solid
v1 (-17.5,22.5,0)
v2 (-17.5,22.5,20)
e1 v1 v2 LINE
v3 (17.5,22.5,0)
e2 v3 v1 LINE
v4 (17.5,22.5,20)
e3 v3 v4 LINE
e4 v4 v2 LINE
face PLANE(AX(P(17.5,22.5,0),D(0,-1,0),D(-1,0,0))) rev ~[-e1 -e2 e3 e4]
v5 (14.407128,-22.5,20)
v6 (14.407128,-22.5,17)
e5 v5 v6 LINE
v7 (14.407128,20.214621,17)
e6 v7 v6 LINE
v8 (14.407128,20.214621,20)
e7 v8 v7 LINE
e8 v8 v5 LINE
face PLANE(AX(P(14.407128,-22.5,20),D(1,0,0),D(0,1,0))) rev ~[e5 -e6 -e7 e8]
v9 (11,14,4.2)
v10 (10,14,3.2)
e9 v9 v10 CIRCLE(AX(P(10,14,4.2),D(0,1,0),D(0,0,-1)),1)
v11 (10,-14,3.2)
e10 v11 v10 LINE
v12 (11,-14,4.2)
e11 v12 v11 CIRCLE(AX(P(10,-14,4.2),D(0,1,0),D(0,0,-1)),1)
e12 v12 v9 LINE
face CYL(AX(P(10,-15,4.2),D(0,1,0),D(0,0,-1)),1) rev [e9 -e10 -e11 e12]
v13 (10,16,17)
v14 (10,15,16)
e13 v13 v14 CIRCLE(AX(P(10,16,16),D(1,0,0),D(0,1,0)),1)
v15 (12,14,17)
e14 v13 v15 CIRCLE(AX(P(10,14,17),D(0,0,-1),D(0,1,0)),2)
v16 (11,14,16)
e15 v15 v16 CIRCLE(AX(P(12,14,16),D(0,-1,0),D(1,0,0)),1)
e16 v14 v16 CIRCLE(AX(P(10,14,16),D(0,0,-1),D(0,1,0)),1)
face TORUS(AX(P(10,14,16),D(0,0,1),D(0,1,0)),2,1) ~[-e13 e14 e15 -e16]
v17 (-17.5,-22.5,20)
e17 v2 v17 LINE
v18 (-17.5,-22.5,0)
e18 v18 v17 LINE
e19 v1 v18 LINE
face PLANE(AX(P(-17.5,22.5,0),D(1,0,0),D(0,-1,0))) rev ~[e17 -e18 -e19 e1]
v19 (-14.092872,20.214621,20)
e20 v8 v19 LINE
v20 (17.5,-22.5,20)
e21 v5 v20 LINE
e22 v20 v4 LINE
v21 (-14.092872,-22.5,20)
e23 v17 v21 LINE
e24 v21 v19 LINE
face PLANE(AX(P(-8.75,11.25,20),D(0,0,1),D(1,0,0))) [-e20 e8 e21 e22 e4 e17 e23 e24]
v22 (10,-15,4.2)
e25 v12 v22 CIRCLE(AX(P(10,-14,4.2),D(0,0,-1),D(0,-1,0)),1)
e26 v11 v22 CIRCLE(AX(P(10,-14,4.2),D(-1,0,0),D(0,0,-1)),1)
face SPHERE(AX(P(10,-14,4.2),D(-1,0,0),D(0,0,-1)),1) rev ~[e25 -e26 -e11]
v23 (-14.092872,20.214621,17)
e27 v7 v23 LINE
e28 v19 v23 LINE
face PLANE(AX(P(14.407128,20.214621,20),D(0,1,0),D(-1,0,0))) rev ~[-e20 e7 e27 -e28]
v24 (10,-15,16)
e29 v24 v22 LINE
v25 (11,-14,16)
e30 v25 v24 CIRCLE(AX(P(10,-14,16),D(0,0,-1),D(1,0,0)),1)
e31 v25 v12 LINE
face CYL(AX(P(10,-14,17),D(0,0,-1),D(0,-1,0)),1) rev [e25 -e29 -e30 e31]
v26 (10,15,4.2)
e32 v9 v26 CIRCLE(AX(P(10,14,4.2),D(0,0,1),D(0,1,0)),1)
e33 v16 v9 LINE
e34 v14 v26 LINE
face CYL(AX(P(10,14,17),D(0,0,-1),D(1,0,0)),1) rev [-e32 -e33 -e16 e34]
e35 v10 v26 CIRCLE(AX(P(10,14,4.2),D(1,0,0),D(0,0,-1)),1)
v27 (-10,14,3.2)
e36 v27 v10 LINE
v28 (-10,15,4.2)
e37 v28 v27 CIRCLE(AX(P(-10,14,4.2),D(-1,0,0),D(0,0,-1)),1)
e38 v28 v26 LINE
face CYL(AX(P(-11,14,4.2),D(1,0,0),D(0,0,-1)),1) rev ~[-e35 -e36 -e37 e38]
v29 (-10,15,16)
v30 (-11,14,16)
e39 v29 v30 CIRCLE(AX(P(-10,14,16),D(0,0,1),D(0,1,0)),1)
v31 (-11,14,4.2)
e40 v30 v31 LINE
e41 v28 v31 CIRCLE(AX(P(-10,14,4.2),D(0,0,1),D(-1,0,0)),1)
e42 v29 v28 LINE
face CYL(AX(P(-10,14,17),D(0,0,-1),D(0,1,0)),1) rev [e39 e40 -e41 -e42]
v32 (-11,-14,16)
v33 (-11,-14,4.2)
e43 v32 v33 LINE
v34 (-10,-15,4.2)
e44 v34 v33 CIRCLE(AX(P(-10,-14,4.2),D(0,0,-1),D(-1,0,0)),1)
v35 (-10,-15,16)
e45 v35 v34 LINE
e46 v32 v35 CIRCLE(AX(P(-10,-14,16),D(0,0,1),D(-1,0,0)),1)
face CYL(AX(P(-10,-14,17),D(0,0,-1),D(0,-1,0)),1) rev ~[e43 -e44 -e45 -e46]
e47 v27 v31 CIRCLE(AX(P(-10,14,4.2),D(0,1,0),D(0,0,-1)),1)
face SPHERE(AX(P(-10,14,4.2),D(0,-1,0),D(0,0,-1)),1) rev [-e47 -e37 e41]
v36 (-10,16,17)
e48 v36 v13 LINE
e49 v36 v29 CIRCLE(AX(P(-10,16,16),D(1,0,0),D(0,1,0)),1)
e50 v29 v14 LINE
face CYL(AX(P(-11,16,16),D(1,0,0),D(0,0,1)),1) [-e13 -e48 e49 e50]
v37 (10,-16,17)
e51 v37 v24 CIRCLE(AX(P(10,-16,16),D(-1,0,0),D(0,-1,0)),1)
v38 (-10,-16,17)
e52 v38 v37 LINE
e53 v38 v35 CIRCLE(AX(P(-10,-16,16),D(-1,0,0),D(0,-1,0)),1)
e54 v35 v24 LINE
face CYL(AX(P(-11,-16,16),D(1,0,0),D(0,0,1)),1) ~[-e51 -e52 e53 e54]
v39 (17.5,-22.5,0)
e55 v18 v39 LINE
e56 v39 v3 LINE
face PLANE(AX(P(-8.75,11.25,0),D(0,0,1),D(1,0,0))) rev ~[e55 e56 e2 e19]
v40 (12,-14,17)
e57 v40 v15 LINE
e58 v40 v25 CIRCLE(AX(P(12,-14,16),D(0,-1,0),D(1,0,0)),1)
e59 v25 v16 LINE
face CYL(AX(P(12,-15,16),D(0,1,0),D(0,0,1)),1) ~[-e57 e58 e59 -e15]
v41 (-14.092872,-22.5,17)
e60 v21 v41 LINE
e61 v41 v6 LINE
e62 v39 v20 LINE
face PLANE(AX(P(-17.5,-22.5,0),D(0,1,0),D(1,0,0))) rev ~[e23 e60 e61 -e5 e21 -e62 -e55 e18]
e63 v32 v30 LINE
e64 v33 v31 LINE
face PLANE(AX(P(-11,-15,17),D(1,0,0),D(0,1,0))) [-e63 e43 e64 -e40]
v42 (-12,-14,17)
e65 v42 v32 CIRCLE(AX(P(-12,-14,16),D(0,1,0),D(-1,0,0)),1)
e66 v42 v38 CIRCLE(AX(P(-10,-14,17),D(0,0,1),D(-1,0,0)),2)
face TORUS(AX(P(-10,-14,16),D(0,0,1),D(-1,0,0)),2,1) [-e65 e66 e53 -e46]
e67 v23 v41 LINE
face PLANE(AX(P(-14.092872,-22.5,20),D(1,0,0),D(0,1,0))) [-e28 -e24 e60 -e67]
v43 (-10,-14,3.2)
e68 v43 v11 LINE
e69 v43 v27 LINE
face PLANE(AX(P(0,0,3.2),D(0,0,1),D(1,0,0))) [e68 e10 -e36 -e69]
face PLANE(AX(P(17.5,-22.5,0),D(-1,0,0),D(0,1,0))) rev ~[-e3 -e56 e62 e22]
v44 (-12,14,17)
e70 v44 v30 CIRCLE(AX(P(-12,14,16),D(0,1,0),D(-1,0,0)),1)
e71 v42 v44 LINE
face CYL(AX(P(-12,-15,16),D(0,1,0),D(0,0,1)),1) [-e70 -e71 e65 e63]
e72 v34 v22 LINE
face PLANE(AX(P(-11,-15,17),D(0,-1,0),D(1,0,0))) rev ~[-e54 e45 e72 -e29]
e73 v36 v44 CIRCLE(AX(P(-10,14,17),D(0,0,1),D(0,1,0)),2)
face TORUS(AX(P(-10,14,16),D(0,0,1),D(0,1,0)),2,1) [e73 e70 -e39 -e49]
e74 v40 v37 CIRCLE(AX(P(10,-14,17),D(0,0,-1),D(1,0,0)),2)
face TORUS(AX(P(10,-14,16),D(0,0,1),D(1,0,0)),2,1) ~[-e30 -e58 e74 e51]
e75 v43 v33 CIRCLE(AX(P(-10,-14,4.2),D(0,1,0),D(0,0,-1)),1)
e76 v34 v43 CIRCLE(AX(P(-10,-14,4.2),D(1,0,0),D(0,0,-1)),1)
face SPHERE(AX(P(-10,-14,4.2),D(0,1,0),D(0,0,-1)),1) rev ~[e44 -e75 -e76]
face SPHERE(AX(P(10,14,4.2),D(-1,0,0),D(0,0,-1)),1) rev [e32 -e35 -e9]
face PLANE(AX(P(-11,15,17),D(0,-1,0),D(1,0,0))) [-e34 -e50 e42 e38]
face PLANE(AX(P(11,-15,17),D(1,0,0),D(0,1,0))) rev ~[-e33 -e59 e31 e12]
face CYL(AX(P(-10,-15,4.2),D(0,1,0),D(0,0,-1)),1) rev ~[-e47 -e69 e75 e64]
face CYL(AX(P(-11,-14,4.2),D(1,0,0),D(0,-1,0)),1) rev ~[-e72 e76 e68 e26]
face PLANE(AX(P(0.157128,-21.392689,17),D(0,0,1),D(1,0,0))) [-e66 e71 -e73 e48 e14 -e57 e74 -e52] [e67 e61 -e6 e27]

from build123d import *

# Parameters (mm, degrees)
F1_DEPTH = 20
F3_DEPTH = 3
F4_W     = 22
F4_H     = 30
F5_DEPTH = 13.8
F6_W     = 28.5
F6_H     = 2.2146213427
F7_DEPTH = 3
F8_R     = 1


with BuildPart() as f1:
    # F0 (on Top) → F1 (new body)
    with BuildSketch(Plane.XY):
        Polygon((0, 22.5), (-17.5, 22.5), (-17.5, 0), (-14.605, 0), (0, 0), (0, 20.066), align=None)
        Polygon((17.5, 22.5), (0, 22.5), (0, 20.066), (0, 0), (-14.605, 0), (-17.5, 0), (-17.5, -22.5), (17.5, -22.5), align=None)
    extrude(amount=F1_DEPTH)

    # F2 (on face) → F3 (cut)
    with BuildSketch(Plane.XY.offset(20)):
        Polygon((0.1571281302, 20.2146213427), (-14.0928718698, 20.2146213427), (-14.0928718698, 0), (-14.0928718698, -20.2853786573), (14.4071281302, -20.2853786573), (14.4071281302, 20.2146213427), align=None)
    extrude(amount=-F3_DEPTH, mode=Mode.SUBTRACT)

    # F4 (on face) → F5 (cut)
    with BuildSketch(Plane.XY.offset(17)):
        Rectangle(F4_W, F4_H)
    extrude(amount=-F5_DEPTH, mode=Mode.SUBTRACT)

    # F6 (on face) → F7 (cut, through all)
    with BuildSketch(Plane.XY.offset(20)):
        with Locations((0.1571281302, -21.3926893286)):
            Rectangle(F6_W, F6_H)
    extrude(amount=-F7_DEPTH, mode=Mode.SUBTRACT)

    # F8
    f8_edges = [f1.edges().sort_by_distance(p)[0] for p in [
        (-11, 0, 3.2),
        (0, -15, 3.2),
        (0, 15, 3.2),
        (11, 0, 3.2),
        (0, 15, 17),
        (11, 0, 17),
        (-11, 0, 17),
        (0, -15, 17),
        (11, 15, 10.1),
        (-11, 15, 10.1),
        (11, -15, 10.1),
        (-11, -15, 10.1),
    ]]
    fillet(f8_edges, radius=F8_R)


solid = f1.part
